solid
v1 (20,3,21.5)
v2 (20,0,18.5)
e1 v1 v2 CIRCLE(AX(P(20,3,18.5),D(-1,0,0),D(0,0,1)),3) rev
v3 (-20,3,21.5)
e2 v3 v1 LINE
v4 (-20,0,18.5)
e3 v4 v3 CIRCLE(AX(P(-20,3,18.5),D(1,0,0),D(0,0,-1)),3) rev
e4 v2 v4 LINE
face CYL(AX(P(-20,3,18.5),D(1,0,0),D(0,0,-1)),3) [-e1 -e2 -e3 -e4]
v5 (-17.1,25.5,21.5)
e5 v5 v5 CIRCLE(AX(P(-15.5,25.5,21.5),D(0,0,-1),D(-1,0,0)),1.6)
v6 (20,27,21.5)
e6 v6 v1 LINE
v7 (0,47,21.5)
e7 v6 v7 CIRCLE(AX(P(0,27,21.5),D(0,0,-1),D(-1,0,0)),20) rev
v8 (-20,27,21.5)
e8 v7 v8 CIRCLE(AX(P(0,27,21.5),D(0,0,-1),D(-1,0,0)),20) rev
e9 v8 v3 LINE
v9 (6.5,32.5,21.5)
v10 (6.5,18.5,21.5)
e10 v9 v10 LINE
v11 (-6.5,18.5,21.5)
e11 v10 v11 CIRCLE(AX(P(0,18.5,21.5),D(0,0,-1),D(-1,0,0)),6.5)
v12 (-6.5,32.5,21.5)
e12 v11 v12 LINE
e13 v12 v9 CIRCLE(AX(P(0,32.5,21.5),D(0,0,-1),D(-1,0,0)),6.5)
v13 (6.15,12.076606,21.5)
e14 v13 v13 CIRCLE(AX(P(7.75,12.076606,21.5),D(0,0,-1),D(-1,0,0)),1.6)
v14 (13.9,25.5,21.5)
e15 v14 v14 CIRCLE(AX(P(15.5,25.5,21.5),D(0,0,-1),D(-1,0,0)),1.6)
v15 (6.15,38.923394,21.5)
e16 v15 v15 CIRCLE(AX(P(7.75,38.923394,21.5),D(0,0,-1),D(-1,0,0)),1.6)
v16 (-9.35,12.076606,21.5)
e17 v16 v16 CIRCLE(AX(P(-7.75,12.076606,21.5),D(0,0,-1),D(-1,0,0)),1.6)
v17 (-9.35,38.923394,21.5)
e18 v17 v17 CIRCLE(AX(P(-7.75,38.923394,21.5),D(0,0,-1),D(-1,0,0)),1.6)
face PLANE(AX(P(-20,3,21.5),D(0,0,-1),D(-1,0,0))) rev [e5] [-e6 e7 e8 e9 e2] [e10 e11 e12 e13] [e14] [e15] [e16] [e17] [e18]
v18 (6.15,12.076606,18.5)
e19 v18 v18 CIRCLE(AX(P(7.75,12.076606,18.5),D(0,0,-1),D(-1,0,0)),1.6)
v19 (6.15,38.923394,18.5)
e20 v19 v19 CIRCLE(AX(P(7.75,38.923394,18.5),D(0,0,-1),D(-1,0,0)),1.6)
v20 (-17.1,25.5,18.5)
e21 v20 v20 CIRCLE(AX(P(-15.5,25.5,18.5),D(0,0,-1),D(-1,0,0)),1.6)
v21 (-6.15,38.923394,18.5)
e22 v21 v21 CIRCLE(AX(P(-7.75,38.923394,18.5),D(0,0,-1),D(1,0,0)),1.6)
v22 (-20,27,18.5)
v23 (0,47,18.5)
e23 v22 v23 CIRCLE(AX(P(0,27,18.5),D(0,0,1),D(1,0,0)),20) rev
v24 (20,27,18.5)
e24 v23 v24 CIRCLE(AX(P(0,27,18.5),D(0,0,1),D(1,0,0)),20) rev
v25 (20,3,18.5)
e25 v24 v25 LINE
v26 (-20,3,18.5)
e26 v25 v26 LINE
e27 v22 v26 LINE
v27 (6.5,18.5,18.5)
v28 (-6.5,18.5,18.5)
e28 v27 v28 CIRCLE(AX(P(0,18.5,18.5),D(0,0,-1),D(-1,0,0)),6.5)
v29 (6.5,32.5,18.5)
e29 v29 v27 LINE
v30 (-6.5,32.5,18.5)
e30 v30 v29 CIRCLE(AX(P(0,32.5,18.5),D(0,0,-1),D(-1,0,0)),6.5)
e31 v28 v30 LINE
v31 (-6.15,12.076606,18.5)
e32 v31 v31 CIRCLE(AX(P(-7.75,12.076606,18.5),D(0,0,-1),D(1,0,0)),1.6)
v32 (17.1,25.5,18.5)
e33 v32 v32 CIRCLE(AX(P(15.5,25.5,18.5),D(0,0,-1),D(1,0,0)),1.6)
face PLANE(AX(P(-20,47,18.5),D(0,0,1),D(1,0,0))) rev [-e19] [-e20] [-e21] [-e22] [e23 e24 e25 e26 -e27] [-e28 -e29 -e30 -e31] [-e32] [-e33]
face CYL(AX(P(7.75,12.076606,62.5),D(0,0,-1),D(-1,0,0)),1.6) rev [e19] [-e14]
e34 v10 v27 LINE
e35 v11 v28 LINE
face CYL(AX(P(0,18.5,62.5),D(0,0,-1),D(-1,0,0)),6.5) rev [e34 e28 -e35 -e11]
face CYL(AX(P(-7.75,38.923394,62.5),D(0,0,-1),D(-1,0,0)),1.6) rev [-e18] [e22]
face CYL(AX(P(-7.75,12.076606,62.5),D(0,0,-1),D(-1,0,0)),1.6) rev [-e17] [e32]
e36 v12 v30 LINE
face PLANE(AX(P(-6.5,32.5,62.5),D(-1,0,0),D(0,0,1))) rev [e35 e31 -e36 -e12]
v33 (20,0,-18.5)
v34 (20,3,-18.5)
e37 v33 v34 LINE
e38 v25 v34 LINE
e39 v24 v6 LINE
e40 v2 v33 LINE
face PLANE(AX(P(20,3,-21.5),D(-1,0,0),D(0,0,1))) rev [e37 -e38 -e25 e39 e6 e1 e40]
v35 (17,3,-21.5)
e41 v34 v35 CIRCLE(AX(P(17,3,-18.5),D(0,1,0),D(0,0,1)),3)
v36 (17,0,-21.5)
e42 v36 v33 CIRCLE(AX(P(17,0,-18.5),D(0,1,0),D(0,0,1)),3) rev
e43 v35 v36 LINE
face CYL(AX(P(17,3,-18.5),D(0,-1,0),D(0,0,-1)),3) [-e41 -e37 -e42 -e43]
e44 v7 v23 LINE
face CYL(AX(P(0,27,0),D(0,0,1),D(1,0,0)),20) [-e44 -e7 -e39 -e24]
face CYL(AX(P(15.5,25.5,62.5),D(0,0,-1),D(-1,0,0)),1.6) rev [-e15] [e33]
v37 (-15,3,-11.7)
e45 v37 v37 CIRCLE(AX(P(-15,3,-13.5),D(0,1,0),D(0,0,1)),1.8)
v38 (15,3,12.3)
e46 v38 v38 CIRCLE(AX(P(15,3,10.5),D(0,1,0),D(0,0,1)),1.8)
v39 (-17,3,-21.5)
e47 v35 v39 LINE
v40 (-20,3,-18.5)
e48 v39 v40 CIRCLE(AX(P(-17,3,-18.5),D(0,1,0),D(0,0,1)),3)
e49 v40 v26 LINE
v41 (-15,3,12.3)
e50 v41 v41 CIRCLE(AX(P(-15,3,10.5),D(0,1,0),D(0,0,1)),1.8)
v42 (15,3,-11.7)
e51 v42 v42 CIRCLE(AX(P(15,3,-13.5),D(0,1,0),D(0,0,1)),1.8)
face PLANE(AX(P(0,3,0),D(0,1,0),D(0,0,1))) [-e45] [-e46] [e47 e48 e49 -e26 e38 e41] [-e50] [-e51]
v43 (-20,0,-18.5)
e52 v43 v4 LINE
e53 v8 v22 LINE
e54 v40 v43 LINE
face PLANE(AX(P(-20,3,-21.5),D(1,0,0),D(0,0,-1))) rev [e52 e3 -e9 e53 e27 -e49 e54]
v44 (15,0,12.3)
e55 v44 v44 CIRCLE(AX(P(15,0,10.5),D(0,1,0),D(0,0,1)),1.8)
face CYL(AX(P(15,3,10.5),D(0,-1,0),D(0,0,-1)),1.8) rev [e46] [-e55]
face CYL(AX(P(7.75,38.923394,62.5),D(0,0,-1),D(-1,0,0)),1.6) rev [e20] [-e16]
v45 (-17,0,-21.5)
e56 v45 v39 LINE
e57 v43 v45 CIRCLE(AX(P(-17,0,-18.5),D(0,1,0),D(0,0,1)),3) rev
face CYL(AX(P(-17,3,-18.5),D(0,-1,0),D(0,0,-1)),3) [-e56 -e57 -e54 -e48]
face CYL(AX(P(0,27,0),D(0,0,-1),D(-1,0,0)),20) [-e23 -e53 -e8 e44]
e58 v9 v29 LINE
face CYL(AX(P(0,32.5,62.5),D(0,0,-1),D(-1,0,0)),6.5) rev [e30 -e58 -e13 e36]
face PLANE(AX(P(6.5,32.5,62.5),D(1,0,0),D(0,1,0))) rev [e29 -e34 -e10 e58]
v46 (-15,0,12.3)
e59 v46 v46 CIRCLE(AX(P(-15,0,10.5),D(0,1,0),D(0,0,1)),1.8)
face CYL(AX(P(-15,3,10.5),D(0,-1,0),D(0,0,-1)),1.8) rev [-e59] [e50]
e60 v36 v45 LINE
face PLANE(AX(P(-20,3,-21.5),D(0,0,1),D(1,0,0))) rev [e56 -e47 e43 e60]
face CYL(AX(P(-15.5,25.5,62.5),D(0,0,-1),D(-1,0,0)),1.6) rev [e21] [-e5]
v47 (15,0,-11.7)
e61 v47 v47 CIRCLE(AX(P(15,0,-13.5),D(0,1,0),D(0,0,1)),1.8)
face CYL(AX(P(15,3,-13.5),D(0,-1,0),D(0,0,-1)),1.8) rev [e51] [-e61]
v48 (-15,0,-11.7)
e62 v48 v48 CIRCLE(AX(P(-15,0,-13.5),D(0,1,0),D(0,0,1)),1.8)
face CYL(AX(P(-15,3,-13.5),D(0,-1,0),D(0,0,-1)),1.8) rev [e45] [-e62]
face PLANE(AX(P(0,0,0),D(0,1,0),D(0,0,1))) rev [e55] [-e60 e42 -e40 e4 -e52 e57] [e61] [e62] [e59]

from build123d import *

# Parameters (mm, degrees)
SKETCH_1_W          = 40
SKETCH_1_H          = 43
SKETCH_1_R          = 1.8
EXTRUDE_1_DEPTH     = 3
SKETCH_2_W          = 40
SKETCH_2_H          = 3
EXTRUDE_2_DEPTH     = 44
SKETCH_3_R          = 1.6
CUT_EXTRUDE_1_DEPTH = 44
FILLET_1_R          = 20
FILLET_2_R          = 3
FILLET_3_R          = 3
FILLET_4_R          = 3


with BuildPart() as part:
    # 草图1 → 凸台-拉伸1 (new body)
    with BuildSketch(Plane(origin=(0, 0, 0), x_dir=(1, 0, 0), z_dir=(0, 1, 0))):
        Rectangle(SKETCH_1_W, SKETCH_1_H)
        with Locations(Location((-15, 13.5, 0), (0, 0, 270))):
            Circle(SKETCH_1_R, mode=Mode.SUBTRACT)
        with Locations(Location((15, 13.5, 0), (0, 0, 270))):
            Circle(SKETCH_1_R, mode=Mode.SUBTRACT)
        with Locations(Location((15, -10.5, 0), (0, 0, 270))):
            Circle(SKETCH_1_R, mode=Mode.SUBTRACT)
        with Locations(Location((-15, -10.5, 0), (0, 0, 270))):
            Circle(SKETCH_1_R, mode=Mode.SUBTRACT)
    extrude(amount=EXTRUDE_1_DEPTH)

    # 草图2 → 凸台-拉伸2 (add)
    with BuildSketch(Plane(origin=(0, 3, 0), x_dir=(1, 0, 0), z_dir=(0, 1, 0))):
        with Locations((0, -20)):
            Rectangle(SKETCH_2_W, SKETCH_2_H)
    extrude(amount=EXTRUDE_2_DEPTH)

    # 草图3 → 切除-拉伸1 (cut)
    with BuildSketch(Plane(origin=(0, 0, 18.5), x_dir=(-1, 0, 0), z_dir=(0, 0, -1))):
        with Locations((15.5, 25.5)):
            Circle(SKETCH_3_R)
        with Locations((-15.5, 25.5)):
            Circle(SKETCH_3_R)
        with Locations((-7.75, 38.923393759)):
            Circle(SKETCH_3_R)
        with Locations((-7.75, 12.076606241)):
            Circle(SKETCH_3_R)
        with Locations((7.75, 12.076606241)):
            Circle(SKETCH_3_R)
        with Locations((7.75, 38.923393759)):
            Circle(SKETCH_3_R)
        with BuildLine():
            Line((6.5, 32.5), (6.5, 18.5))
            ThreePointArc((6.5, 18.5), (0, 12), (-6.5, 18.5))
            Line((-6.5, 18.5), (-6.5, 32.5))
            ThreePointArc((-6.5, 32.5), (0, 39), (6.5, 32.5))
        make_face()
    extrude(amount=-CUT_EXTRUDE_1_DEPTH, mode=Mode.SUBTRACT)

    # 圆角1
    fillet_1_edges = [part.edges().sort_by_distance(p)[0] for p in [
        (-20, 47, 20),
        (20, 47, 20),
    ]]
    fillet(fillet_1_edges, radius=FILLET_1_R - 0.0001)  # a hair under: the kernel refuses the full size

    # 圆角2
    fillet_2_edges = [part.edges().sort_by_distance(p)[0] for p in [
        (20, 1.5, -21.5),
    ]]
    fillet(fillet_2_edges, radius=FILLET_2_R)

    # 圆角3
    fillet_3_edges = [part.edges().sort_by_distance(p)[0] for p in [
        (-20, 1.5, -21.5),
    ]]
    fillet(fillet_3_edges, radius=FILLET_3_R)

    # 圆角4
    fillet_4_edges = [part.edges().sort_by_distance(p)[0] for p in [
        (0, 0, 21.5),
    ]]
    fillet(fillet_4_edges, radius=FILLET_4_R)


solid = part.part
